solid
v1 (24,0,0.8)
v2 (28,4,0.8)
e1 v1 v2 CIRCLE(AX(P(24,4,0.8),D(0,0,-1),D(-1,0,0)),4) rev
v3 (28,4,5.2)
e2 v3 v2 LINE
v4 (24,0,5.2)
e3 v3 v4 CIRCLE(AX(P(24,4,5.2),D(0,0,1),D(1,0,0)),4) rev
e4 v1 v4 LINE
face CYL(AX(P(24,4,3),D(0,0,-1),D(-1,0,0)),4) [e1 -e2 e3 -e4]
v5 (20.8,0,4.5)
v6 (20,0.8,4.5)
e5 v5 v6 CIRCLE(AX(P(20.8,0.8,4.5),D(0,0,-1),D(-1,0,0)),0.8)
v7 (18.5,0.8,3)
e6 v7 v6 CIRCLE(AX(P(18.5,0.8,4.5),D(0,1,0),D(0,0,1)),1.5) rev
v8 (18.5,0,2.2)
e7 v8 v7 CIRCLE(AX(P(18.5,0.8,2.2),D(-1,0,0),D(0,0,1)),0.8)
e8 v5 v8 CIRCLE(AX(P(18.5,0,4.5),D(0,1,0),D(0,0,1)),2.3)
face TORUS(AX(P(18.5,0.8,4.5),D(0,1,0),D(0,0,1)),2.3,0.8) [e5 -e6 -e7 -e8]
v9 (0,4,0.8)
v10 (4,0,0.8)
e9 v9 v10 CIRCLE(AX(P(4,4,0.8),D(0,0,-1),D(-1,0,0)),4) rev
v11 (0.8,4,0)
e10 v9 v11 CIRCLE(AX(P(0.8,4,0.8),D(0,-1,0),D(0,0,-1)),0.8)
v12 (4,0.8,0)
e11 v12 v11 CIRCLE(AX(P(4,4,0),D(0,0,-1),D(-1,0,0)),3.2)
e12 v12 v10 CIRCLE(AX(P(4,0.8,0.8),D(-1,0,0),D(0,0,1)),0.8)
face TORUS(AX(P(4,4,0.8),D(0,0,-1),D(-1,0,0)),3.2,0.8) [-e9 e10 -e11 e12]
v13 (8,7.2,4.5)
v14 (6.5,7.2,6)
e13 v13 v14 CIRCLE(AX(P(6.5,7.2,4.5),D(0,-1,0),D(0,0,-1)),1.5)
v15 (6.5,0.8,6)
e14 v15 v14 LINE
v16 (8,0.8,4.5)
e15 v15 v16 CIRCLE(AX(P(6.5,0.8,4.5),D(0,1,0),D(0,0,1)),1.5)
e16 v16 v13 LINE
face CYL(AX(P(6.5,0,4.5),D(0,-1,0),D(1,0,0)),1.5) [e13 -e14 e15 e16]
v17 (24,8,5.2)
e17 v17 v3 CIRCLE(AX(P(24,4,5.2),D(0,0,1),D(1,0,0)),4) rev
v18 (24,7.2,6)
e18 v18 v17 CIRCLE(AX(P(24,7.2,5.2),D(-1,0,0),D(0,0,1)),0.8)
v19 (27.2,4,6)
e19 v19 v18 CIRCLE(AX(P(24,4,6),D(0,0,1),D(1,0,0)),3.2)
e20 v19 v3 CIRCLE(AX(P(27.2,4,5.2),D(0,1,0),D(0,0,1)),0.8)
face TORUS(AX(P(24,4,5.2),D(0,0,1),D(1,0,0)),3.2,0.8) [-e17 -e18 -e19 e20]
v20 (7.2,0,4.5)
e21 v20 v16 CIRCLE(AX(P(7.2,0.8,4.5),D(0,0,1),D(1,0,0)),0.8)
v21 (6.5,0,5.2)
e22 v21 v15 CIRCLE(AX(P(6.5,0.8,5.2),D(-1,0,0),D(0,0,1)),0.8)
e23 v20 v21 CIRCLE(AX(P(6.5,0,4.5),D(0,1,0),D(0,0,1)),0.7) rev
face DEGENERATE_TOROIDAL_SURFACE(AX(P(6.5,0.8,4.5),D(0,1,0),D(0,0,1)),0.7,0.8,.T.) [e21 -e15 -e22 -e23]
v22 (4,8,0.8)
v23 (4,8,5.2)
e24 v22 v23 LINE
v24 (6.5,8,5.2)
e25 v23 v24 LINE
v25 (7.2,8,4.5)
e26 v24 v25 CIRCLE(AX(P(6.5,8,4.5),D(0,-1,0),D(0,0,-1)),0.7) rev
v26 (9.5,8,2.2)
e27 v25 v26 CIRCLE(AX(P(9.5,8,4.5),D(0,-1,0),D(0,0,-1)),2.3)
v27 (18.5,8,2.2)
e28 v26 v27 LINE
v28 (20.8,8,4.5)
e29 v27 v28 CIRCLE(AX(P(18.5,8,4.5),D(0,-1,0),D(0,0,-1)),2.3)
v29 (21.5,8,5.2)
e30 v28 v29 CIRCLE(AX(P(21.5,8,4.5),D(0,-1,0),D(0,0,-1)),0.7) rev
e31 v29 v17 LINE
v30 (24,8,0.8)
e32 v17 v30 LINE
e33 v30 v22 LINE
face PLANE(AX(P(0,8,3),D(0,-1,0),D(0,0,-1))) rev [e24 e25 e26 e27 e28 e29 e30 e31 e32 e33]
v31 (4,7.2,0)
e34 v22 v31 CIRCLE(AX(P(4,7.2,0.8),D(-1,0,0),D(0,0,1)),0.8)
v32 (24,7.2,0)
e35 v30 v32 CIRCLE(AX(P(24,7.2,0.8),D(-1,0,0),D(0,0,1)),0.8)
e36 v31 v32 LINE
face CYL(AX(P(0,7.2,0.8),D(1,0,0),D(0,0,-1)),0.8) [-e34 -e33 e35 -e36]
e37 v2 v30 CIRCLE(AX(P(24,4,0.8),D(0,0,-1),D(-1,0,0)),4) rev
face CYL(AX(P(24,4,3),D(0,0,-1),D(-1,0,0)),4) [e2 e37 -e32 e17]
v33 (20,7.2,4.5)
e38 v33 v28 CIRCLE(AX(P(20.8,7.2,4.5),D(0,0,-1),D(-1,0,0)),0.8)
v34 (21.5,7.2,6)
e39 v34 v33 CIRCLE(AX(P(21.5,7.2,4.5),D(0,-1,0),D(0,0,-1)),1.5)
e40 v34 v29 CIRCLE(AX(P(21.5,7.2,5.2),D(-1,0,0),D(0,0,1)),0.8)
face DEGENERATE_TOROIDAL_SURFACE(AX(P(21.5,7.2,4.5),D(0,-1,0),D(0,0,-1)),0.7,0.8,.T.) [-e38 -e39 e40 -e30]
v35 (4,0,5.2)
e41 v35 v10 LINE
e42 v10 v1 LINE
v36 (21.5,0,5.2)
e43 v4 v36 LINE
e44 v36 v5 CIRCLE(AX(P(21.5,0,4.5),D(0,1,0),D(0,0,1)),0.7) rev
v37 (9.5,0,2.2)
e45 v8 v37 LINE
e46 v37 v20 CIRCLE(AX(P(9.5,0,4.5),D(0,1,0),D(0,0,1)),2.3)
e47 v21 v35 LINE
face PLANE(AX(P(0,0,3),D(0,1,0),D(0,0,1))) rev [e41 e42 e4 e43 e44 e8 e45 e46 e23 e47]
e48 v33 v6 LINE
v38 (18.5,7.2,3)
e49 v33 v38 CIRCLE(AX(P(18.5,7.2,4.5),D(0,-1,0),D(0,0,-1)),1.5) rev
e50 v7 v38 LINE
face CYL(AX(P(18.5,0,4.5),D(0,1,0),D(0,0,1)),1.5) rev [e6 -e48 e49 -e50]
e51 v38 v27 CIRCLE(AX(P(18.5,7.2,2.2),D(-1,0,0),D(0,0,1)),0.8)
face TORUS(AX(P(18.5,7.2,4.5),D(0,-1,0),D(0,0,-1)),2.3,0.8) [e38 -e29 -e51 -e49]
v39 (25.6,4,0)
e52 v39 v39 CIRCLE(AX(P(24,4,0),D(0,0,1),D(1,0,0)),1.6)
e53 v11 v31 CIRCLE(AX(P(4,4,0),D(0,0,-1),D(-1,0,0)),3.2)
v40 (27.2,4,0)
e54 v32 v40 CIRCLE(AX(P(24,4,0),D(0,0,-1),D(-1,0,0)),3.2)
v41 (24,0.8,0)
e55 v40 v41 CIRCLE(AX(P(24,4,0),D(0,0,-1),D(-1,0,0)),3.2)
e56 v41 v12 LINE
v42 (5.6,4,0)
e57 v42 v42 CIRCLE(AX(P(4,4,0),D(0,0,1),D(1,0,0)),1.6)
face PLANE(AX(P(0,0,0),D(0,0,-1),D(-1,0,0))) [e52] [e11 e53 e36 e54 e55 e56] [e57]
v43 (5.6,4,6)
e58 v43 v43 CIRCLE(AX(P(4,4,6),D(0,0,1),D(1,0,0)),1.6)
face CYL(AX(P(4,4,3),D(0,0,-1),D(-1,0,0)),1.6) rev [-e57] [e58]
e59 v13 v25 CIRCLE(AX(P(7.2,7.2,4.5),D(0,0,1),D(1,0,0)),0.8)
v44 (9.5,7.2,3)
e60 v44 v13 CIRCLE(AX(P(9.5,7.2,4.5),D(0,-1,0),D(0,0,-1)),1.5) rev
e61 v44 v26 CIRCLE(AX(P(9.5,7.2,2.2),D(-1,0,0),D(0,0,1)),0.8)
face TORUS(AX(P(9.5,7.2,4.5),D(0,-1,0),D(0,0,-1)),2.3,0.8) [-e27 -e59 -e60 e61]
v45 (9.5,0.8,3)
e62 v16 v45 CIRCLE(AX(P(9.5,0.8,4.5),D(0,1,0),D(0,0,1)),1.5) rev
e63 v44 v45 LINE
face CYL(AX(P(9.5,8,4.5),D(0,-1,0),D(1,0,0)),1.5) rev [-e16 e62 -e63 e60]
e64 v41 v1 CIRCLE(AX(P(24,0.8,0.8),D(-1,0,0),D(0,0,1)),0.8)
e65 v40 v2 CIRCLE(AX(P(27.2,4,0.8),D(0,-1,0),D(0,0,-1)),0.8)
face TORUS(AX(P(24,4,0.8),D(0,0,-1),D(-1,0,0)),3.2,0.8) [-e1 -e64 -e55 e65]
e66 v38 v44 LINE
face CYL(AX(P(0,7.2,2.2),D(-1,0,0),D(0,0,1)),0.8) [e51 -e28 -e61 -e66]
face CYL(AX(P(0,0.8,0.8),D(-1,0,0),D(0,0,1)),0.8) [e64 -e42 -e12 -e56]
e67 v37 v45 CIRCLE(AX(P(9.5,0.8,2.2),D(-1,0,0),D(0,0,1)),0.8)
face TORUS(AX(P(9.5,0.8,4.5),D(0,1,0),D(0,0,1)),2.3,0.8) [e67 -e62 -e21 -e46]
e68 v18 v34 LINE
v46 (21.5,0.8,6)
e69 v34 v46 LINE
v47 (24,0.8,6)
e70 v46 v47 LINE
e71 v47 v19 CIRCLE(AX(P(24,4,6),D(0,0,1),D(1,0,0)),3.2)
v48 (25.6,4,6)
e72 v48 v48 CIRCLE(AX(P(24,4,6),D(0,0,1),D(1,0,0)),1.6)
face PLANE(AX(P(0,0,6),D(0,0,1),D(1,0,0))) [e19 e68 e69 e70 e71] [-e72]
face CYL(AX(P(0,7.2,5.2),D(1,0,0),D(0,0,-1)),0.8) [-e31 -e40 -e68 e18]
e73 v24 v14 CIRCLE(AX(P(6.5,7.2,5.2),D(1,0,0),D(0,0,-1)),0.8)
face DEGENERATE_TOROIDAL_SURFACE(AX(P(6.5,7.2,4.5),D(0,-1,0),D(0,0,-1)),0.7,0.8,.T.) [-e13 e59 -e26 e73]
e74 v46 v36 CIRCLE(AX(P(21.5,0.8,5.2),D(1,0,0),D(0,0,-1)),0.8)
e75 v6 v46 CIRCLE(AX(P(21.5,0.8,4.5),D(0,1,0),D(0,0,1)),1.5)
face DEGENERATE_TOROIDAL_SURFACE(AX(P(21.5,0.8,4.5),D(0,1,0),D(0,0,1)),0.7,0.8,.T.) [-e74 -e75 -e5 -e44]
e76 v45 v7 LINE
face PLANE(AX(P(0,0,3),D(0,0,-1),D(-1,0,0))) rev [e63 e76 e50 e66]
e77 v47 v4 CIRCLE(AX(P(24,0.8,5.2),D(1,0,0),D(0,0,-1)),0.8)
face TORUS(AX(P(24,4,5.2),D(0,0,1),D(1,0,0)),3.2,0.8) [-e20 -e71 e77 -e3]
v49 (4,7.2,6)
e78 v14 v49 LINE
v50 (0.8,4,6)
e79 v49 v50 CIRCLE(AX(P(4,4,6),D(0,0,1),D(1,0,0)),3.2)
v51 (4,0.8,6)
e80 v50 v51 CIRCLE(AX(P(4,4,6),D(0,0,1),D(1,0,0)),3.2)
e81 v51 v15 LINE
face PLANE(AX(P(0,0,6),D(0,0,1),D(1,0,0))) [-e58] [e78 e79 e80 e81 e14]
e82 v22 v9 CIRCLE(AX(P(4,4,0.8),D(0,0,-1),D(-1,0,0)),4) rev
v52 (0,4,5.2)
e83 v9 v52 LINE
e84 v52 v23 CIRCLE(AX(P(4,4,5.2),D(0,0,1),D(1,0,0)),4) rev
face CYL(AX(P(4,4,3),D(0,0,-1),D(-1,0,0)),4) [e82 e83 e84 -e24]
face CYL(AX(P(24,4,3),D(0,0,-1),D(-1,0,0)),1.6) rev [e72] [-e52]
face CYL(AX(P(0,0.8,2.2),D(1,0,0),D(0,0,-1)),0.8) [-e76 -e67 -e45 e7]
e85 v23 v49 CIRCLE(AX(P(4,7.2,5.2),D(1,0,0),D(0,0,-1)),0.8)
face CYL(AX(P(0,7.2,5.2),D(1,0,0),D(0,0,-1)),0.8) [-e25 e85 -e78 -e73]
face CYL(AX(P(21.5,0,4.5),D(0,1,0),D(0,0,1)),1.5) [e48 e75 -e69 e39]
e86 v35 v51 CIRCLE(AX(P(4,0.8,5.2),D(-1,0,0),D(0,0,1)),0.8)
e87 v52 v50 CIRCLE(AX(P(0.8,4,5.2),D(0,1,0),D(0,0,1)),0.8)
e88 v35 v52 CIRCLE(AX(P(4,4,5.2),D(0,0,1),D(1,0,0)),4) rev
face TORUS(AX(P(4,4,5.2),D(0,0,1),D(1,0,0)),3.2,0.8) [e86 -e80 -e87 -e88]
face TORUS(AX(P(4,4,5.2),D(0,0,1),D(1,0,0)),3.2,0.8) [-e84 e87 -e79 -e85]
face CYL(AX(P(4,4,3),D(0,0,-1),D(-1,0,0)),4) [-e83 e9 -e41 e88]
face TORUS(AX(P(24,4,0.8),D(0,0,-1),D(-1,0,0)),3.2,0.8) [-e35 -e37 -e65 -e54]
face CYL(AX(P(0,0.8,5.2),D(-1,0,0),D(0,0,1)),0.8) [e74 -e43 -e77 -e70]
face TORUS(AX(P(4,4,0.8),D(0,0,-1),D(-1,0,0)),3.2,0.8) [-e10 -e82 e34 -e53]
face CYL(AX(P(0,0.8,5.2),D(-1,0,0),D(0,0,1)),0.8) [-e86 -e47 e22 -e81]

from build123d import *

# Parameters (mm, degrees)
SKETCH1_W           = 28
SKETCH1_H           = 8
SKETCH1_R           = 1.6
BOSS_EXTRUDE1_DEPTH = 3
SKETCH2_W           = 8
SKETCH2_H           = 8
SKETCH2_R           = 1.6
BOSS_EXTRUDE2_DEPTH = 3
FILLET1_R           = 4
FILLET2_START       = -1
FILLET2_DEPTH       = 10
FILLET2_2_DEPTH     = 8
FILLET3_R           = 0.8


with BuildPart() as part:
    # Sketch1 → Boss-Extrude1 (new body)
    with BuildSketch(Plane.XY):
        with Locations((14, 4)):
            Rectangle(SKETCH1_W, SKETCH1_H)
        with Locations((4, 4)):
            Circle(SKETCH1_R, mode=Mode.SUBTRACT)
        with Locations((24, 4)):
            Circle(SKETCH1_R, mode=Mode.SUBTRACT)
    extrude(amount=BOSS_EXTRUDE1_DEPTH)

    # Sketch2 → Boss-Extrude2 (add)
    # profile 1 of 2: a face of its own
    with BuildSketch(Plane.XY.offset(3)):
        with Locations((4, 4)):
            Rectangle(SKETCH2_W, SKETCH2_H)
        with Locations((4, 4)):
            Circle(SKETCH2_R, mode=Mode.SUBTRACT)
    # profile 2 of 2: a face of its own
    with BuildSketch(Plane.XY.offset(3)):
        with Locations((24, 4)):
            Rectangle(SKETCH2_W, SKETCH2_H)
        with Locations((24, 4)):
            Circle(SKETCH2_R, mode=Mode.SUBTRACT)
    extrude(amount=BOSS_EXTRUDE2_DEPTH)

    # Fillet1
    fillet1_edges = [part.edges().sort_by_distance(p)[0] for p in [
        (28, 8, 3),
        (28, 0, 3),
        (0, 8, 3),
        (0, 0, 3),
    ]]
    fillet(fillet1_edges, radius=FILLET1_R - 0.0001)  # a hair under: the kernel refuses the full size

    # Fillet2: read off the stored shape, not the designer's step
    # Fillet2 outline → Fillet2 (cut)
    with BuildSketch(Plane(origin=(0, 0, 0), x_dir=(1, 0, 0), z_dir=(0, 1, 0)).offset(FILLET2_START)):
        with BuildLine():
            Line((8, -6), (8, -4.5))
            ThreePointArc((8, -4.5), (7.560660172, -5.560660172), (6.5, -6))
            Line((6.5, -6), (8, -6))
        make_face()
        with BuildLine():
            ThreePointArc((21.5, -6), (20.439339828, -5.560660172), (20, -4.5))
            Line((20, -4.5), (20, -6))
            Line((20, -6), (21.5, -6))
        make_face()
    extrude(amount=FILLET2_DEPTH, mode=Mode.SUBTRACT)

    # Fillet2 2 outline → Fillet2 2 (add)
    with BuildSketch(Plane(origin=(0, 0, 0), x_dir=(1, 0, 0), z_dir=(0, 1, 0))):
        with BuildLine():
            Line((8, -3), (8, -4.5))
            ThreePointArc((8, -4.5), (8.439339828, -3.439339828), (9.5, -3))
            Line((9.5, -3), (8, -3))
        make_face()
        with BuildLine():
            Line((20, -3), (18.5, -3))
            ThreePointArc((18.5, -3), (19.560660172, -3.439339828), (20, -4.5))
            Line((20, -4.5), (20, -3))
        make_face()
    extrude(amount=FILLET2_2_DEPTH)

    # Fillet3
    fillet3_edges = [part.edges().sort_by_distance(p)[0] for p in [
        (14, 8, 0),
        (22.75005, 8, 6),
        (14, 0, 0),
        (1.171543586, 1.171543586, 0),
        (1.171543586, 6.828456414, 0),
        (26.828456414, 1.171543586, 0),
        (26.828456414, 6.828456414, 0),
        (26.828456414, 1.171543586, 6),
        (26.828456414, 6.828456414, 6),
        (5.24995, 0, 6),
        (1.171543586, 1.171543586, 6),
        (1.171543586, 6.828456414, 6),
        (5.24995, 8, 6),
        (14, 8, 3),
        (20.439339828, 8, 5.560660172),
        (7.560660172, 8, 5.560660172),
        (22.75005, 0, 6),
        (14, 0, 3),
        (20.439339828, 0, 5.560660172),
        (7.560660172, 0, 5.560660172),
        (19.560660172, 0, 3.439339828),
        (19.560660172, 8, 3.439339828),
        (8.439339828, 8, 3.439339828),
        (8.439339828, 0, 3.439339828),
    ]]
    fillet(fillet3_edges, radius=FILLET3_R)


solid = part.part
